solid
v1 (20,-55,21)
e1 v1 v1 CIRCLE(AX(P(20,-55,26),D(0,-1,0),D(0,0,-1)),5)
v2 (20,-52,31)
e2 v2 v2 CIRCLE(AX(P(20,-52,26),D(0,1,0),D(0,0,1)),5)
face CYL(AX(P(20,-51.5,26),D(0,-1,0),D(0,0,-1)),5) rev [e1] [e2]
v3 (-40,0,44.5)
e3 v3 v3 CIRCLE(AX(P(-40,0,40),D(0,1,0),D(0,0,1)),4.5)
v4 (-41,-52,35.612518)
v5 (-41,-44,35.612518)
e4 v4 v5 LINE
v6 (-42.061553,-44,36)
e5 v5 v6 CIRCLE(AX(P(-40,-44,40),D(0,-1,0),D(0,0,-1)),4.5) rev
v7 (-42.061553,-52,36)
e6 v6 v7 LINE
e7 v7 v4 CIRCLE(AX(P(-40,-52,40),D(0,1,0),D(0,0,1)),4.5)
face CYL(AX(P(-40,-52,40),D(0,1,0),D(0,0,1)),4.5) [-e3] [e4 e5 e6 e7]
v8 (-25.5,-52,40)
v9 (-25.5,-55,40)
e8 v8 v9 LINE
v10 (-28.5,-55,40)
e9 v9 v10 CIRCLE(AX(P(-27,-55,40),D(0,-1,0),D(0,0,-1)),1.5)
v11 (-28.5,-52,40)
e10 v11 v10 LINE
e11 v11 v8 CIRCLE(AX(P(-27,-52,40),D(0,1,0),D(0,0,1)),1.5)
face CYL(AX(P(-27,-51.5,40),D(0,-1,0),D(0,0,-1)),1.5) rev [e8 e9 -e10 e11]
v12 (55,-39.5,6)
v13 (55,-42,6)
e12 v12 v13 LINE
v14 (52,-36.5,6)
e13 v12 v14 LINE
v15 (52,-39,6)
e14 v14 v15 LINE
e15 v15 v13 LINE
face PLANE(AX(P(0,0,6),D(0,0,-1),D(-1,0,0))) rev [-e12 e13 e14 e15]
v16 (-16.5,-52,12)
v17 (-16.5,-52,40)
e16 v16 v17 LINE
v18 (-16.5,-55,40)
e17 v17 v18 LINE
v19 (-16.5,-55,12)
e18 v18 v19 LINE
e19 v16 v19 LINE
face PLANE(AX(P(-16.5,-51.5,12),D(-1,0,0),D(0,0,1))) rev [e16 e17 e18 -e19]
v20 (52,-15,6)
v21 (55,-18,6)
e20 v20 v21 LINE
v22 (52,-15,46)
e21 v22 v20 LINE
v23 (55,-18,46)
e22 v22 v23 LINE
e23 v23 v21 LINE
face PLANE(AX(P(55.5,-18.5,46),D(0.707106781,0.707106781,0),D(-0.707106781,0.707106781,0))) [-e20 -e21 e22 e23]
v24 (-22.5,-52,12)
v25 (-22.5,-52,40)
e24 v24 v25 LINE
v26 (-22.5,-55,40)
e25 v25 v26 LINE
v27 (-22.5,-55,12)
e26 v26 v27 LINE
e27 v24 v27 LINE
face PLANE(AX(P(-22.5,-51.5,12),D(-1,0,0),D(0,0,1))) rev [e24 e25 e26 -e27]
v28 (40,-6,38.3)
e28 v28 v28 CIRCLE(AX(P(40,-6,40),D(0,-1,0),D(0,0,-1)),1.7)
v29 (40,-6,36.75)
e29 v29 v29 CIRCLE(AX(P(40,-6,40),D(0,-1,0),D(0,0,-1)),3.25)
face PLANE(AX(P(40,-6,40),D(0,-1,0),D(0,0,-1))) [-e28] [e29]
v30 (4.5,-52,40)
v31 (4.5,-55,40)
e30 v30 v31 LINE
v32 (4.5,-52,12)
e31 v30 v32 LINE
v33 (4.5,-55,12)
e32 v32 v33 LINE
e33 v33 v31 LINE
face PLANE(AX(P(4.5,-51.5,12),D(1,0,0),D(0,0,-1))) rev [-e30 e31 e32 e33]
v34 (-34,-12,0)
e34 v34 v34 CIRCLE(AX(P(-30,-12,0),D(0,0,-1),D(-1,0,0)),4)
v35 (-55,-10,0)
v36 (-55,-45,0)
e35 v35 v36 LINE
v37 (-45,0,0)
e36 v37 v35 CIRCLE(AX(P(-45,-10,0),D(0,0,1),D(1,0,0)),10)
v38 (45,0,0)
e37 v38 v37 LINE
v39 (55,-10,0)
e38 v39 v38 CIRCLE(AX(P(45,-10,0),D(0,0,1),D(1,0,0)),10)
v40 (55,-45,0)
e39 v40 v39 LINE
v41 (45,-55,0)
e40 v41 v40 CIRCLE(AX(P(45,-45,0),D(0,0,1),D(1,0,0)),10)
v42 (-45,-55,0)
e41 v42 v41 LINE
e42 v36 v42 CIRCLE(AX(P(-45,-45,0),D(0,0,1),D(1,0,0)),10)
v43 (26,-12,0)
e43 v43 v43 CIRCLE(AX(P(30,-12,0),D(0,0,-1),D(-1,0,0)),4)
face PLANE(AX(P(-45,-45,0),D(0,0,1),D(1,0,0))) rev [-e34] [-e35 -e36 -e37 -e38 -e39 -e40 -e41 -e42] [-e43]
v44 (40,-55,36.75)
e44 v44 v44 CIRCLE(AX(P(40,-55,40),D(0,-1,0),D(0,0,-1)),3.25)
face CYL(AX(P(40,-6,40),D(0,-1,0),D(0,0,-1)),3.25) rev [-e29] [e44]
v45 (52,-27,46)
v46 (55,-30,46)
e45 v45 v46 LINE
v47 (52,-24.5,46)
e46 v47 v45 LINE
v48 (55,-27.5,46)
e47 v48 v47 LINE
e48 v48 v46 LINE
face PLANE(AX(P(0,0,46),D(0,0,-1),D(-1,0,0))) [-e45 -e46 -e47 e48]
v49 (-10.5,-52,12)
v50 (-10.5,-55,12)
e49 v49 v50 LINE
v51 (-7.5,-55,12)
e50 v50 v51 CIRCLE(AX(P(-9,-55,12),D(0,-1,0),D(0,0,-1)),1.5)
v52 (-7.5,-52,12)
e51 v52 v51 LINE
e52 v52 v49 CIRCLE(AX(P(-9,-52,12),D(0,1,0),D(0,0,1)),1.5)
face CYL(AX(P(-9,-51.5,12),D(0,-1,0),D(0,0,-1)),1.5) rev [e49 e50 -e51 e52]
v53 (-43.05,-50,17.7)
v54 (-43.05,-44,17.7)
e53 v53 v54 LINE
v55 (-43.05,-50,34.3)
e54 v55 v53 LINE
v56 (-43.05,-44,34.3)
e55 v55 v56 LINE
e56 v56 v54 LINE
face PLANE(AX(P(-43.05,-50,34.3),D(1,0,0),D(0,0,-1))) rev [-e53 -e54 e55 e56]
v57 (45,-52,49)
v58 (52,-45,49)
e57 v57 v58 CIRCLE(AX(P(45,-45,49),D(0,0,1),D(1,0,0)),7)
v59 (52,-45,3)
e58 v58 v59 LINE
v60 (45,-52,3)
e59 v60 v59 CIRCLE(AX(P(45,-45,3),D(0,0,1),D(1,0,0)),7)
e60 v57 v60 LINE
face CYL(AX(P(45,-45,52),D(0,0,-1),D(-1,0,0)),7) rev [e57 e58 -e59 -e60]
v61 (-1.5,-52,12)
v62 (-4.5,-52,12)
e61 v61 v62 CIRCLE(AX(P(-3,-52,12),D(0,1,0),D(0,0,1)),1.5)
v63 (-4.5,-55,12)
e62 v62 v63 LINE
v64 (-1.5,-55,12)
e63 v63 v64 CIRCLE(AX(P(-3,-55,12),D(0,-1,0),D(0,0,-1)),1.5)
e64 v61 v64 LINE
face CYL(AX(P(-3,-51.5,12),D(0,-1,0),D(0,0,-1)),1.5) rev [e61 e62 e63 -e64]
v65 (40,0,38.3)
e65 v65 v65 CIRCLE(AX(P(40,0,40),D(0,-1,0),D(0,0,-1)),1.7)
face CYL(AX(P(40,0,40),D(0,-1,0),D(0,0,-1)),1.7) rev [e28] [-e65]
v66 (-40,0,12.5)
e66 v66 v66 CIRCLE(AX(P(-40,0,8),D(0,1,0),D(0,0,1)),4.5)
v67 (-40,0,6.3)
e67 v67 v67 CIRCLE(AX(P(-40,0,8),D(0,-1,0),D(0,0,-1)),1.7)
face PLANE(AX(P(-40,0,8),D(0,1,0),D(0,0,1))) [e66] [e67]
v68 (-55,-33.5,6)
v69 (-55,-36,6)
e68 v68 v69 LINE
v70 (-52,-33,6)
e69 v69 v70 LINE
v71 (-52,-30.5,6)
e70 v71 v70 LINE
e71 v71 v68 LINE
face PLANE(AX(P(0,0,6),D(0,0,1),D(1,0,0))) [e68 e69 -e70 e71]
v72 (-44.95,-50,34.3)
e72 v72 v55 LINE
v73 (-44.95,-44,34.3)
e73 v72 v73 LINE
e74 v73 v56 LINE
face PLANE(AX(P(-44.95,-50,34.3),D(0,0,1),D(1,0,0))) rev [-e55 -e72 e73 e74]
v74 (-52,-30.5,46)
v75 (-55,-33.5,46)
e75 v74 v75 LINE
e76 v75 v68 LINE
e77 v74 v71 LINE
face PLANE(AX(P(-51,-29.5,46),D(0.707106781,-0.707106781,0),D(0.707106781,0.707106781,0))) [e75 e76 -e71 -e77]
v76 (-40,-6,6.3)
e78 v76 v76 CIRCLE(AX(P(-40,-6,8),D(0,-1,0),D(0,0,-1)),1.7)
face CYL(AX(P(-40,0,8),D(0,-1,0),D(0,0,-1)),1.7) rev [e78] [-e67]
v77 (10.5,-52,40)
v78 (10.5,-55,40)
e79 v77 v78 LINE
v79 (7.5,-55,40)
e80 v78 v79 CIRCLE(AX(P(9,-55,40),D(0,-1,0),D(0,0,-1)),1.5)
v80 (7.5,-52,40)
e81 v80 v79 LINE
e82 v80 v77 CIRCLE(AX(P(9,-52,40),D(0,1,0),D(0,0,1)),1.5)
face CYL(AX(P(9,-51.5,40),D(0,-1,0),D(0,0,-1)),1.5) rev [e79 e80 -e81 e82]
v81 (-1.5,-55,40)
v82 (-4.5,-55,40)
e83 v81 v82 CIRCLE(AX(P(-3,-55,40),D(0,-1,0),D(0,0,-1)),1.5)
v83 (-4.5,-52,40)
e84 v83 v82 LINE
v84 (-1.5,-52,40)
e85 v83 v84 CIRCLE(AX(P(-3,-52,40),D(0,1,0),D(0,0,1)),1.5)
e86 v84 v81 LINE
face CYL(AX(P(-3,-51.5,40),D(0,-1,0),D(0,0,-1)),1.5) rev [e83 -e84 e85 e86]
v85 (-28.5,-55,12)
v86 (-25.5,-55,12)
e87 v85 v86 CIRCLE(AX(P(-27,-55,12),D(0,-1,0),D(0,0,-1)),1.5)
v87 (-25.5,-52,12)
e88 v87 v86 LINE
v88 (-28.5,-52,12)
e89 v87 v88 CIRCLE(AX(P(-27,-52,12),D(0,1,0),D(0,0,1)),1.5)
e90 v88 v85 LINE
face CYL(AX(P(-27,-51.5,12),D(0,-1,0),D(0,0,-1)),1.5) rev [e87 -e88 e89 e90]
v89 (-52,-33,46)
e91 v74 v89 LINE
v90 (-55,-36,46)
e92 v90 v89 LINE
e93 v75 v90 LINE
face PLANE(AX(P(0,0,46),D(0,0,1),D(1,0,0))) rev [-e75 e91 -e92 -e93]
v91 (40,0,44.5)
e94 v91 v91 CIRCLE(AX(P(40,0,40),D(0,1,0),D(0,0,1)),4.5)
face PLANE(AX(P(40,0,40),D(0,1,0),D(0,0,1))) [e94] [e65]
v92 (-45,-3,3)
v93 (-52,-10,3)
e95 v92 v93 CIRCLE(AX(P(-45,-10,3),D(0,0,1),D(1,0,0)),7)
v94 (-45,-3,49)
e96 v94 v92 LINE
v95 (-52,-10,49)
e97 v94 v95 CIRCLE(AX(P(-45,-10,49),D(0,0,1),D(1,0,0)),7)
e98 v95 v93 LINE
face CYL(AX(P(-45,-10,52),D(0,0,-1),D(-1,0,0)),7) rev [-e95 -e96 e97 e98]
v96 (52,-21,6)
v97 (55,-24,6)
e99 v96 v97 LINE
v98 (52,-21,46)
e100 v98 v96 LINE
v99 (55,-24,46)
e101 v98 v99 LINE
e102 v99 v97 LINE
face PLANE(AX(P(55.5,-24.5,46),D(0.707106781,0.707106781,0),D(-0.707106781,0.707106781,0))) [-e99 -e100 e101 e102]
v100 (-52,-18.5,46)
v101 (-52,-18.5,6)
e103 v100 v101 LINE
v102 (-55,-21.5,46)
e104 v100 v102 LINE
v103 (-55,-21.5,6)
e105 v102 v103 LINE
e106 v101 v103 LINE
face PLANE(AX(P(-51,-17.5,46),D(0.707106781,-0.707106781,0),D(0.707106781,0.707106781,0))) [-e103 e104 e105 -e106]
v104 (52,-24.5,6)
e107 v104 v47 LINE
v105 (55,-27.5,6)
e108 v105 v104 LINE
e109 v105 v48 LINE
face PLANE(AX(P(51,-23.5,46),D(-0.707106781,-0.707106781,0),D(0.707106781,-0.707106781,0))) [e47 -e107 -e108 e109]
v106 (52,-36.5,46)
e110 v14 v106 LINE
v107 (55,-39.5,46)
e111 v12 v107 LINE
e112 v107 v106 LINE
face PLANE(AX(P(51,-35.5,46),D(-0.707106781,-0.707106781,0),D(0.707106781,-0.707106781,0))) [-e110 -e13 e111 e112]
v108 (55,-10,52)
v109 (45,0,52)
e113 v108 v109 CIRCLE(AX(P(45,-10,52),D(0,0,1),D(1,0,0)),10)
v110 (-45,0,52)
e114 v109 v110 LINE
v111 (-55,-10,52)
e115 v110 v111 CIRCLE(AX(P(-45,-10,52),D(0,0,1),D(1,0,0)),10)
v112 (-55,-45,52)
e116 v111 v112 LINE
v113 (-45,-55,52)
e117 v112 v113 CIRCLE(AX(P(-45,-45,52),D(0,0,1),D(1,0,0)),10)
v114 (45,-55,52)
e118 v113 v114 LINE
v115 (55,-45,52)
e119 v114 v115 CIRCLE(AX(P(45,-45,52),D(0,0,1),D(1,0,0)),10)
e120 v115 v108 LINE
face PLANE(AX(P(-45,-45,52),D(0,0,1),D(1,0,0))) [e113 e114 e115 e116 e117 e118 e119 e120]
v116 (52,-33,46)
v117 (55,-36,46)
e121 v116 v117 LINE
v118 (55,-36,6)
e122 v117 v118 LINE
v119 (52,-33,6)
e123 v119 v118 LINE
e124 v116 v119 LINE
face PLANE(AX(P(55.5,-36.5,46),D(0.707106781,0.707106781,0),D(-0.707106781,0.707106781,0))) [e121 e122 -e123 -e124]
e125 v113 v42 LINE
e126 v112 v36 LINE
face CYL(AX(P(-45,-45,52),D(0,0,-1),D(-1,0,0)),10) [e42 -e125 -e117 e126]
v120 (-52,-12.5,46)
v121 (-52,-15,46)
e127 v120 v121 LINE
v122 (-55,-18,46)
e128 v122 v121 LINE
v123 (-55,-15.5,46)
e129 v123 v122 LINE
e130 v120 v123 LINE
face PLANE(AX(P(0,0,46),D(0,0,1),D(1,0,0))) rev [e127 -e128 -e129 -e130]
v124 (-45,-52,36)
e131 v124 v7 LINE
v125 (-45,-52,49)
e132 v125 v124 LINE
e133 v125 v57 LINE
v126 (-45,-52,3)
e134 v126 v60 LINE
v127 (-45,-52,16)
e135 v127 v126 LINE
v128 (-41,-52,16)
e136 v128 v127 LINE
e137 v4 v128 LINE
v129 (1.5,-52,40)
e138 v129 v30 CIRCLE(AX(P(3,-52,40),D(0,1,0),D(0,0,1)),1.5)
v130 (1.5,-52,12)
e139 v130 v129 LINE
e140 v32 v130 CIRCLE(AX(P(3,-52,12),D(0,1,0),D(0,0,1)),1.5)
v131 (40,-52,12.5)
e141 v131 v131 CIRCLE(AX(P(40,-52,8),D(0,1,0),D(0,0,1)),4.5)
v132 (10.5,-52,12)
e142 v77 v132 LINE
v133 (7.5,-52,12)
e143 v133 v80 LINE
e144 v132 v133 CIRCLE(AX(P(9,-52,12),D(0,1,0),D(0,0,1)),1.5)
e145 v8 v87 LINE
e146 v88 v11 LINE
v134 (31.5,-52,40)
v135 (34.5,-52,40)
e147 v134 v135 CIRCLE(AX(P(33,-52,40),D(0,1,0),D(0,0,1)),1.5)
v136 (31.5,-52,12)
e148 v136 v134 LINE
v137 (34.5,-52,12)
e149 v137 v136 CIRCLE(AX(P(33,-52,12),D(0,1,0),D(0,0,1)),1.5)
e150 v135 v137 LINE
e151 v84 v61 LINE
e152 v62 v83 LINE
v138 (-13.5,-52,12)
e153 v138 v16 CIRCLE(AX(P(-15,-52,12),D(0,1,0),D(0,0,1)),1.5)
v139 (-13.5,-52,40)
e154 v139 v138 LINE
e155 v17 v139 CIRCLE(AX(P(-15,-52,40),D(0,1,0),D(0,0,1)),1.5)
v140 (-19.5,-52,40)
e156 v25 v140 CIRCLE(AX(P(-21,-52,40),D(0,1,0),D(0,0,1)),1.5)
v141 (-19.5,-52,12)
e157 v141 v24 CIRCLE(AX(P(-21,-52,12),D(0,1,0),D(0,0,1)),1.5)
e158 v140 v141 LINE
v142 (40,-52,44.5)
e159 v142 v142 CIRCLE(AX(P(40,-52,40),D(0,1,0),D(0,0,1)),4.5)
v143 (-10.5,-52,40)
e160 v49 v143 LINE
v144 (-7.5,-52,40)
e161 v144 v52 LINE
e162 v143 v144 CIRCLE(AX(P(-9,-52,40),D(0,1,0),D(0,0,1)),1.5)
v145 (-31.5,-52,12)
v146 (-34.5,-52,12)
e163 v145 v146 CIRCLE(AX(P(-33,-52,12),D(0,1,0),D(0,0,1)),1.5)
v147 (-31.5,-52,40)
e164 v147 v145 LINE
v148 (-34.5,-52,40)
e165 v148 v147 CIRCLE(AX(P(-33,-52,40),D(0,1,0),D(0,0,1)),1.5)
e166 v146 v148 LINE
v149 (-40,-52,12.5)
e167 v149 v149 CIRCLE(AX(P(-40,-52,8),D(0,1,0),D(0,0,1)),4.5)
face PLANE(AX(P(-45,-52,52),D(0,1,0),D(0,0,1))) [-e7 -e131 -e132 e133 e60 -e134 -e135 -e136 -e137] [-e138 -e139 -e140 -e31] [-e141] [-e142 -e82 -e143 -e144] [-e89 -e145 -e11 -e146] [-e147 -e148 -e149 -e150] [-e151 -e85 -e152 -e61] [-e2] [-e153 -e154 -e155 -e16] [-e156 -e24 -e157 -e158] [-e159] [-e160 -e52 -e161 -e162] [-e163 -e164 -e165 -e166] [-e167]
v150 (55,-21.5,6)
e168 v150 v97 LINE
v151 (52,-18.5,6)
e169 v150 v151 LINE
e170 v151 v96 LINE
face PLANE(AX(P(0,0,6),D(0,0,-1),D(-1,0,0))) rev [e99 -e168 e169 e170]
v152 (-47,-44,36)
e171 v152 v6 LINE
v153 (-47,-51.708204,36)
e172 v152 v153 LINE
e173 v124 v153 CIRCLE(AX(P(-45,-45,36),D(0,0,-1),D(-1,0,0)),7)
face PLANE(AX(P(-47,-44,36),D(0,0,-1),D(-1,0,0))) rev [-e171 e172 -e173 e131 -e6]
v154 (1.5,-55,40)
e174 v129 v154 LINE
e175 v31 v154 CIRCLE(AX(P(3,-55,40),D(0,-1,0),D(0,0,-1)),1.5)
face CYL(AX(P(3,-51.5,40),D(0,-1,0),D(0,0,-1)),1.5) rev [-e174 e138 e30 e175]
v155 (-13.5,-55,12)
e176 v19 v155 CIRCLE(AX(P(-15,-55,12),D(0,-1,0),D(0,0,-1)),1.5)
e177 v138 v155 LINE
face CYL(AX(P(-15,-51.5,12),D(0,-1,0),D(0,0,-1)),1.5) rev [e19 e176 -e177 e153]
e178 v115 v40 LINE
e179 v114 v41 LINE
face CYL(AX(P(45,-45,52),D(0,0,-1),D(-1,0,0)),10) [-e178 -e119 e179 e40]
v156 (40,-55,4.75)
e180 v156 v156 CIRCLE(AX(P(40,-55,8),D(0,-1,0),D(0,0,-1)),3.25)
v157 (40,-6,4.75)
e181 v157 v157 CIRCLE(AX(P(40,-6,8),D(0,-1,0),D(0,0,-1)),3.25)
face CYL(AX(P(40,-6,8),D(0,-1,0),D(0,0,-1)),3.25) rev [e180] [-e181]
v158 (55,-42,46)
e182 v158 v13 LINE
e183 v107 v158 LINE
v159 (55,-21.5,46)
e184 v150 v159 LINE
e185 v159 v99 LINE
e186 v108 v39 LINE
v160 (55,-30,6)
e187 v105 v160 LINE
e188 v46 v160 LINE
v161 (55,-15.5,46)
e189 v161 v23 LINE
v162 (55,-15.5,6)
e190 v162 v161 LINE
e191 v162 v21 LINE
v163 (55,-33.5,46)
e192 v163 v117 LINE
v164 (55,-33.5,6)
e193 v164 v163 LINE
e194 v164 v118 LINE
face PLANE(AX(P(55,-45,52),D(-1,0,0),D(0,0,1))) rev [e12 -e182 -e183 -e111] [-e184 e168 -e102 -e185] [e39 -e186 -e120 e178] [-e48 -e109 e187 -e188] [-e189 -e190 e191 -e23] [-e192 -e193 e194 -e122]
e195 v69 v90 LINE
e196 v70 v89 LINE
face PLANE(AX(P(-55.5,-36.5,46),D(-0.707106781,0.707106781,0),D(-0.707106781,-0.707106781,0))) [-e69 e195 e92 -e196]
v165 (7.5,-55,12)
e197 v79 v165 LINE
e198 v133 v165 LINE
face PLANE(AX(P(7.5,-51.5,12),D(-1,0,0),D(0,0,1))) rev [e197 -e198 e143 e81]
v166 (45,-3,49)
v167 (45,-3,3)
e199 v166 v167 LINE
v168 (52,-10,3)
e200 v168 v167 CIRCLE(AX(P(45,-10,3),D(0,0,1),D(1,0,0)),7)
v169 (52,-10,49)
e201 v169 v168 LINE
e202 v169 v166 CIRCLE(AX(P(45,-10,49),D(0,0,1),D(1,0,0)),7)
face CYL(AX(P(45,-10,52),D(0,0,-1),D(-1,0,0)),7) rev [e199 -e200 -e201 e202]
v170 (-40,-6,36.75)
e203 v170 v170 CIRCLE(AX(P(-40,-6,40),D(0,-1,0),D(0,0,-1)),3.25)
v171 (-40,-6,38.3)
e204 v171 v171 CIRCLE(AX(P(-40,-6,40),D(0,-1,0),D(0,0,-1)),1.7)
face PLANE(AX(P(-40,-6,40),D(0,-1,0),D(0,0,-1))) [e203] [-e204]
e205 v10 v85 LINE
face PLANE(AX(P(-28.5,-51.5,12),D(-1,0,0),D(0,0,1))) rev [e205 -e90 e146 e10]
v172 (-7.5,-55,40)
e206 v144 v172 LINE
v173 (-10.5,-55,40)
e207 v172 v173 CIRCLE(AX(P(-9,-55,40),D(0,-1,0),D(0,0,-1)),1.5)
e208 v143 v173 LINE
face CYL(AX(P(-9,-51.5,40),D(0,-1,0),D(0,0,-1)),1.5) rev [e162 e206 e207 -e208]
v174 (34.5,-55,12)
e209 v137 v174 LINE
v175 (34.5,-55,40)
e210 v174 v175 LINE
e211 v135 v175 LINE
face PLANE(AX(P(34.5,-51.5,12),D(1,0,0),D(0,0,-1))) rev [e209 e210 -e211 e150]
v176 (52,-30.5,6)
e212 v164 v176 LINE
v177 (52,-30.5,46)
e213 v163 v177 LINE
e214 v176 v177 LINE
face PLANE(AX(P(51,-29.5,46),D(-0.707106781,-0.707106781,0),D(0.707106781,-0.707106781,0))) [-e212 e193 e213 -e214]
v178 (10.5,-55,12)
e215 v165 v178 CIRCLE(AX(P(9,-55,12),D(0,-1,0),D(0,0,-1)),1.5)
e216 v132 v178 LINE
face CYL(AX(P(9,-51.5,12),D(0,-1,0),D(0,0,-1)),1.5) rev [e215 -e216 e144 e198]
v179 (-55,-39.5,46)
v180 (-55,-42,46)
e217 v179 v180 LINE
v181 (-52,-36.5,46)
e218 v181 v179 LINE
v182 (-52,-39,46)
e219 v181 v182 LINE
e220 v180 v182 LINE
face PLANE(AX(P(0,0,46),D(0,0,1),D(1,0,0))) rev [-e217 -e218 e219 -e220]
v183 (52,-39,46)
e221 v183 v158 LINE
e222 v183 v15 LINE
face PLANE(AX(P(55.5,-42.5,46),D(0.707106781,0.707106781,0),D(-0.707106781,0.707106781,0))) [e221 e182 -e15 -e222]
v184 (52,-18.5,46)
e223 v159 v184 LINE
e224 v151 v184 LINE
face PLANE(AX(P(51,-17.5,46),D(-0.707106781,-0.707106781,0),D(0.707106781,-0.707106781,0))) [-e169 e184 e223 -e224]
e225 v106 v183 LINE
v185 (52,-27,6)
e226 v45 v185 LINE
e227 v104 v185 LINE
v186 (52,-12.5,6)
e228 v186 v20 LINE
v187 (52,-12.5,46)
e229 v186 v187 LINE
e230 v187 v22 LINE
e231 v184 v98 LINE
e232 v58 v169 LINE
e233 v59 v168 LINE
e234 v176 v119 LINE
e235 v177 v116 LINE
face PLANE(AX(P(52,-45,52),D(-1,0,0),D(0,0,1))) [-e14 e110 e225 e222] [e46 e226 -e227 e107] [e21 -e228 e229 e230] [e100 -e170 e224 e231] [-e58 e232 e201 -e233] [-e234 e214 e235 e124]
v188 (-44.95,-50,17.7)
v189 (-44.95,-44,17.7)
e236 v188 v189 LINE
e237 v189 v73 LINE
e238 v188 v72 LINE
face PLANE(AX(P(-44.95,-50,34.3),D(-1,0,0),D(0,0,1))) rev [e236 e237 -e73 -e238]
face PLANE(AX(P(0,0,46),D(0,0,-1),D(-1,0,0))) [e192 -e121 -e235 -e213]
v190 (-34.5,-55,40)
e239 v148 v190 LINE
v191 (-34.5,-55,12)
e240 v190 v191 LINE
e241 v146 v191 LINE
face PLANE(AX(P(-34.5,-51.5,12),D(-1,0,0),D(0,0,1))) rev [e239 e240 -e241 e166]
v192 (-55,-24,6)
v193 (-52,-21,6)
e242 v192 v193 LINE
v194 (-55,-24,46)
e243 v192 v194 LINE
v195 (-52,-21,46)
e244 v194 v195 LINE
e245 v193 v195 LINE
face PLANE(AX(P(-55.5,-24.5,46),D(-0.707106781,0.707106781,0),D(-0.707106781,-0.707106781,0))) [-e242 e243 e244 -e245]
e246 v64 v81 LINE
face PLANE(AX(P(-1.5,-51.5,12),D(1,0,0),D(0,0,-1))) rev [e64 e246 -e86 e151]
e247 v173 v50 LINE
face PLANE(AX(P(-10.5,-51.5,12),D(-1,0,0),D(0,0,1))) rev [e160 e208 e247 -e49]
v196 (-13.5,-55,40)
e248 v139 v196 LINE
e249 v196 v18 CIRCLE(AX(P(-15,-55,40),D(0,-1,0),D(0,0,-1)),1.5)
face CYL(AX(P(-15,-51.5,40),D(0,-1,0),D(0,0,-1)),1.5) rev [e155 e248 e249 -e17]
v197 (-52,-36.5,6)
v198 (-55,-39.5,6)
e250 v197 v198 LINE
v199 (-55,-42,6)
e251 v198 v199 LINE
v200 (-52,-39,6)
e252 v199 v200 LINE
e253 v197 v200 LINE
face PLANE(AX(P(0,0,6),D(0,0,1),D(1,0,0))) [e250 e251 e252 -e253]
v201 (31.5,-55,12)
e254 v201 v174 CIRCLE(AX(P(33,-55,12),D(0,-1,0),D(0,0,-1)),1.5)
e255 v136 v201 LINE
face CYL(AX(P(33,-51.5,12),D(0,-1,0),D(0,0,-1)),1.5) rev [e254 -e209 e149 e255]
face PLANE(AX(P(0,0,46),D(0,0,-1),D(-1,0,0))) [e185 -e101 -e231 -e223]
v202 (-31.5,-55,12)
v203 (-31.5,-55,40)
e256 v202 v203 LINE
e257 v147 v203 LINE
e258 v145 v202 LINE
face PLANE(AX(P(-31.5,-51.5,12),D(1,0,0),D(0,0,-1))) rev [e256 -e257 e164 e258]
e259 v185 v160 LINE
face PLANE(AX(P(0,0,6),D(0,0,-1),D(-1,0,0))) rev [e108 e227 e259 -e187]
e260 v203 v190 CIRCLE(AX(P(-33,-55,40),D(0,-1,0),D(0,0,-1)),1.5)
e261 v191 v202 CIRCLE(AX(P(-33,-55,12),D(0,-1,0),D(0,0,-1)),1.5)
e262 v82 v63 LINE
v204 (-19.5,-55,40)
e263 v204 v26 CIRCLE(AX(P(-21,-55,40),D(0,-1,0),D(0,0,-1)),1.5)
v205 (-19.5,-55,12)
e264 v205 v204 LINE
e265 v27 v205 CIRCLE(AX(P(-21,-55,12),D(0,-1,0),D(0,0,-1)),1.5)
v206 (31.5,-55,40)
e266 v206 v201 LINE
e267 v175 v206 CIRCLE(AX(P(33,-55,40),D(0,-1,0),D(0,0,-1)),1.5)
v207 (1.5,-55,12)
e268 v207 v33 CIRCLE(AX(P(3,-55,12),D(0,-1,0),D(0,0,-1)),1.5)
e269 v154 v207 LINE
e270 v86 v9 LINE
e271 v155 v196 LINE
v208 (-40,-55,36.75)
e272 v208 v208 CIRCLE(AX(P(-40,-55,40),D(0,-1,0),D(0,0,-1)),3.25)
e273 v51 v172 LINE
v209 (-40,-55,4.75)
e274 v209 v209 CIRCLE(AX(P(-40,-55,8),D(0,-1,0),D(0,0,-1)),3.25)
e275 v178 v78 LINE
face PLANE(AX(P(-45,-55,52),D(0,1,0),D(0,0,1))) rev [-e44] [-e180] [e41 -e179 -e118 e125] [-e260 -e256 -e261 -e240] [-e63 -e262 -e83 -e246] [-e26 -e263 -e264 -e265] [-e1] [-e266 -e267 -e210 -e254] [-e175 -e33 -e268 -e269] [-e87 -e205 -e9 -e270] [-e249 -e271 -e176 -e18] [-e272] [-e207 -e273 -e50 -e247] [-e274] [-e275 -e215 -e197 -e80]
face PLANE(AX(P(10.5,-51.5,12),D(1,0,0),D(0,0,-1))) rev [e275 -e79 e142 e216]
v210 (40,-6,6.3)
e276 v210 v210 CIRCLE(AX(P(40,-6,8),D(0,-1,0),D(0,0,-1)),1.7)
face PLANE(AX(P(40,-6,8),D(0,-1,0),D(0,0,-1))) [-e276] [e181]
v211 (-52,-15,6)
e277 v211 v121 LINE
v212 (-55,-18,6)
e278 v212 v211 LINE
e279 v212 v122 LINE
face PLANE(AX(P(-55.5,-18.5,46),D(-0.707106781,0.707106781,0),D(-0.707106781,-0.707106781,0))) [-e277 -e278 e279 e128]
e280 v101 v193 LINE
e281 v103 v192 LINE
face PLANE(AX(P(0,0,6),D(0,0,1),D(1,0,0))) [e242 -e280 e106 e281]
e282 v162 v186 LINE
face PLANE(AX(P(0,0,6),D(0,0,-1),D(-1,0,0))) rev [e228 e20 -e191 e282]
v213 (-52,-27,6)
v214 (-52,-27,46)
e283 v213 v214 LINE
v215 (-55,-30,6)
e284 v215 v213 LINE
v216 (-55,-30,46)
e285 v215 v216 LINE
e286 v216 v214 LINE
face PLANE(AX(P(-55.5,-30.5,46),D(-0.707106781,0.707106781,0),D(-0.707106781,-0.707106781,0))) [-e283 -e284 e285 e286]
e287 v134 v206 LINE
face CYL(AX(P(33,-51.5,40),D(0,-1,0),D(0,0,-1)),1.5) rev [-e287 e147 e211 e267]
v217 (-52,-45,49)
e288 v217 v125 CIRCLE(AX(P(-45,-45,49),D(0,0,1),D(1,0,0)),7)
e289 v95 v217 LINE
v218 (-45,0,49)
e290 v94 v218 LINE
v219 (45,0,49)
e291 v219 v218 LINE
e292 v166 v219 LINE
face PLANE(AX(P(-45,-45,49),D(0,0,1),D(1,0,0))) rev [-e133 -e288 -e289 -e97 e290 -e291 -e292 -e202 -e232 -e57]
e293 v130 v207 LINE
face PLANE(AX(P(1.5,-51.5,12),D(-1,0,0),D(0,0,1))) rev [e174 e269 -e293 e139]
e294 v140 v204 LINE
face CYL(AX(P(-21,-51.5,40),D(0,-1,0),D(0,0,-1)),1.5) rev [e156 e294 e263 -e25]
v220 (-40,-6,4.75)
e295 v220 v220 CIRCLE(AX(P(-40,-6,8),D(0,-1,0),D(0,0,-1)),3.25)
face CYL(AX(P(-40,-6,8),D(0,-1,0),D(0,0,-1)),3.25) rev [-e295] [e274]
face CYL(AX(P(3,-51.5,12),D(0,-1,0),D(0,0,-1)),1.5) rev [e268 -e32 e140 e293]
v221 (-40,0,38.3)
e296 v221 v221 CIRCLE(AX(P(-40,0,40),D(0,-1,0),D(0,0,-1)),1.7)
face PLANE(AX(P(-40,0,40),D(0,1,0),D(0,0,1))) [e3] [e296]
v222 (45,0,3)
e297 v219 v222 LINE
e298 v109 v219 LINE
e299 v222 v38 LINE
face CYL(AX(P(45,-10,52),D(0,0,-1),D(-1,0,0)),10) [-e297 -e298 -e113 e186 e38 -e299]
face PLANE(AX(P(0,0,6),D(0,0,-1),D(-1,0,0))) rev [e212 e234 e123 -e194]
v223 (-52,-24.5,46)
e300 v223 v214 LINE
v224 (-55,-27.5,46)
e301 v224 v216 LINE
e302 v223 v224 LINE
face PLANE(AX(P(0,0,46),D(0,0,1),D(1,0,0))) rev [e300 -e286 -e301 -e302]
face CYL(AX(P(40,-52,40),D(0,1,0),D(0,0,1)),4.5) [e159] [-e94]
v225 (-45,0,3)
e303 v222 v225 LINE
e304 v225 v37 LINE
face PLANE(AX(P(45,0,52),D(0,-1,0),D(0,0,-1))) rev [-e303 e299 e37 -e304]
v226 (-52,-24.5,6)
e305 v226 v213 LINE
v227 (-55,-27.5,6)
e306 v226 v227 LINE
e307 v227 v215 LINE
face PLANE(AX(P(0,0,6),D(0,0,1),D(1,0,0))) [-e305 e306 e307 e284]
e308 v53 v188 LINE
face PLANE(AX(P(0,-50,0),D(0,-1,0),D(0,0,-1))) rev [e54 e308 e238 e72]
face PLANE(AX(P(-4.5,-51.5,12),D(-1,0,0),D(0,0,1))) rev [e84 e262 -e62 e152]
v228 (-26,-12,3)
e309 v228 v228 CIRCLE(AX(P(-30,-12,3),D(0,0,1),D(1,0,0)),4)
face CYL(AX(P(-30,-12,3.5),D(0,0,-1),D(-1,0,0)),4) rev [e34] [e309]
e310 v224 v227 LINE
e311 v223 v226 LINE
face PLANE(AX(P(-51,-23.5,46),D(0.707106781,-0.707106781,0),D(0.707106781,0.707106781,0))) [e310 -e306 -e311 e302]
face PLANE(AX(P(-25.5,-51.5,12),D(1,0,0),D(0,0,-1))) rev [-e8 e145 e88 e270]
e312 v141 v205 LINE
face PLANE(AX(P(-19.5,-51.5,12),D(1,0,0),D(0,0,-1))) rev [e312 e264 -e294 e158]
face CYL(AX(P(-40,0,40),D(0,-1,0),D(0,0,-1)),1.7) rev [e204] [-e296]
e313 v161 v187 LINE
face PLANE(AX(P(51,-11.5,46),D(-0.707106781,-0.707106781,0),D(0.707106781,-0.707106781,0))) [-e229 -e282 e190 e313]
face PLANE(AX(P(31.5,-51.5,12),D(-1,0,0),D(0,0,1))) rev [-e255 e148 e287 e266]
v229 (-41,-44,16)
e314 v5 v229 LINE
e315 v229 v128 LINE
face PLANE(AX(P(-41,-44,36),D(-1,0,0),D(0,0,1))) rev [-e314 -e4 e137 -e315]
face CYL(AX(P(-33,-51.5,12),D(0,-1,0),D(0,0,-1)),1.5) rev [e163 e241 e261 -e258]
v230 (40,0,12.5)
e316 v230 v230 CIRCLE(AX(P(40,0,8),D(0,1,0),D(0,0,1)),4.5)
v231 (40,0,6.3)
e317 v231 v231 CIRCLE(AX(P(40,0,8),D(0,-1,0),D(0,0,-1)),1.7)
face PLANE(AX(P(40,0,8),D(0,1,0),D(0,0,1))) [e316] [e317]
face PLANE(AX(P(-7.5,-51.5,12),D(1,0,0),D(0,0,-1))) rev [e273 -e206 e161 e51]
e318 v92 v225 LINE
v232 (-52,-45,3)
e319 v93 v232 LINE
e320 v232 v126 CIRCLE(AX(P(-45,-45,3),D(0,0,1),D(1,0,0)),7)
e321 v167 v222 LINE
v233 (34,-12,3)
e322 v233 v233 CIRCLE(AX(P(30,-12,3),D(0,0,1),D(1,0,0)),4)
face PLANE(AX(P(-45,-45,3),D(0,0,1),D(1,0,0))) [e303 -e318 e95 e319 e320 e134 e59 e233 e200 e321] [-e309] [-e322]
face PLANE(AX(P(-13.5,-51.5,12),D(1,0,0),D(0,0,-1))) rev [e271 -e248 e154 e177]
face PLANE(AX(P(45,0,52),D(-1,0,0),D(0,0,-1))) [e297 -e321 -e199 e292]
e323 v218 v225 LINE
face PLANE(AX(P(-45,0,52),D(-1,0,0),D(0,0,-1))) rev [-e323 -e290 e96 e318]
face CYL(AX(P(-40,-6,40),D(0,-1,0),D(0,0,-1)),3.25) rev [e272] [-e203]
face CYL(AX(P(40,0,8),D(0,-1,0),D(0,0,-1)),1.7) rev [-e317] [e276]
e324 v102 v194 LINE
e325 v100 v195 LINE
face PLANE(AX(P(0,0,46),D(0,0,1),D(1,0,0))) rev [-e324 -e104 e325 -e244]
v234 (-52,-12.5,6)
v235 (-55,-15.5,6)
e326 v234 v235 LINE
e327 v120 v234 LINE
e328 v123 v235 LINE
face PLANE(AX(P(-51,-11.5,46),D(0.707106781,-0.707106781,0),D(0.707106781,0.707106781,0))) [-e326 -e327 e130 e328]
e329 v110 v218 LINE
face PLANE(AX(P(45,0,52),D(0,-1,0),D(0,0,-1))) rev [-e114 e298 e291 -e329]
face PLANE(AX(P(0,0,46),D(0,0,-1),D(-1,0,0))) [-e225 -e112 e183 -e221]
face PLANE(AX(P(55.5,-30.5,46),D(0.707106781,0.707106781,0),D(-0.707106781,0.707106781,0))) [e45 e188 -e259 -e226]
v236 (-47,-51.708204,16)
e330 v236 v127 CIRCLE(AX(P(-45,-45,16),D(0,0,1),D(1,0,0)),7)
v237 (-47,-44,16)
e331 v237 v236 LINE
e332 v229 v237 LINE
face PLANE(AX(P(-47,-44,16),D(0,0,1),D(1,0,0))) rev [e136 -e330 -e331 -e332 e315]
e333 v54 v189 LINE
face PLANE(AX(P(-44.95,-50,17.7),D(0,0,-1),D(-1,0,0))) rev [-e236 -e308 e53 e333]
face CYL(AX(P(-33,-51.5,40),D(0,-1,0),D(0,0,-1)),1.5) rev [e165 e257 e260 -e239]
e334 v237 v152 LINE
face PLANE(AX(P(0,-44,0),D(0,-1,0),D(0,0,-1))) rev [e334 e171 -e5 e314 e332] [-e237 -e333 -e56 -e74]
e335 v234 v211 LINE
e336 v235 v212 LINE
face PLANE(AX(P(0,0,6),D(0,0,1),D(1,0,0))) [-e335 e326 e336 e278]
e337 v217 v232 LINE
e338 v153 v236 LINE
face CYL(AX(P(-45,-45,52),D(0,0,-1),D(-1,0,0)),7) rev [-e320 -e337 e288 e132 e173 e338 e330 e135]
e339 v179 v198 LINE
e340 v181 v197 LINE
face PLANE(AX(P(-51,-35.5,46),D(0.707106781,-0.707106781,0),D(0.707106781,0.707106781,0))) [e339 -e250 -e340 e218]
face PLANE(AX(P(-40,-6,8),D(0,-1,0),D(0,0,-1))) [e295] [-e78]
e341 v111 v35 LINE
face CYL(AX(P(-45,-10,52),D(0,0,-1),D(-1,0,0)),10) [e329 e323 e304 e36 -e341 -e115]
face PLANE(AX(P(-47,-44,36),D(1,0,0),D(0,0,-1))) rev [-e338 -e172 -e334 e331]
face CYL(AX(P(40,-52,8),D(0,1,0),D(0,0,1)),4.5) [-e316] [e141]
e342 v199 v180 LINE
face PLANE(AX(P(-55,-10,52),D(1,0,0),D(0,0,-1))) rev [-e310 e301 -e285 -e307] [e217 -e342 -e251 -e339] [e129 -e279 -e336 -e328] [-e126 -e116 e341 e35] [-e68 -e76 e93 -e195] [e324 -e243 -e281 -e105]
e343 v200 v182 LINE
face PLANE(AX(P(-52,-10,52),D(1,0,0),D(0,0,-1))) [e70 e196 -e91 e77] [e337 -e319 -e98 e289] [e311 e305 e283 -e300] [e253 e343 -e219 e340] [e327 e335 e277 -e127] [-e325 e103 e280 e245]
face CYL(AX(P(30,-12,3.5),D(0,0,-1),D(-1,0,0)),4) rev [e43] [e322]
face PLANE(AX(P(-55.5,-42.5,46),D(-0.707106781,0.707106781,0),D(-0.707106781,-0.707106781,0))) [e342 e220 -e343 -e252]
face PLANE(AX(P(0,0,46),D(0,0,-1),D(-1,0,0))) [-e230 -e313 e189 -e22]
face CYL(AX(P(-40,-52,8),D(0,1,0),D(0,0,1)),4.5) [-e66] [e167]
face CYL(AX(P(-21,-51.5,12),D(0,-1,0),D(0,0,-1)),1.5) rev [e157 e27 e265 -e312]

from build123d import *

# Parameters (mm, degrees)
BOSS_EXTRUDE1_DEPTH     = 52
SHELL1_START            = 3
SHELL1_DEPTH            = 46
SKETCH2_R               = 4.5
BOSS_EXTRUDE2_DEPTH     = 52
SKETCH3_R               = 3.25
CUT_EXTRUDE1_DEPTH      = 49
SKETCH4_R               = 1.7
CUT_EXTRUDE2_DEPTH      = 91.166512631
CUT_EXTRUDE3_DEPTH      = 20
CUT_EXTRUDE3_DEPTH_BACK = 20
CUT_EXTRUDE4_DEPTH      = 3.5
SKETCH7_R               = 4
CUT_EXTRUDE5_DEPTH      = 3.5
SKETCH8_W               = 6
SKETCH8_H               = 20
BOSS_EXTRUDE3_DEPTH     = 8
SKETCH9_W               = 1.9
SKETCH9_H               = 16.6
CUT_EXTRUDE6_DEPTH      = 6
SKETCH10_R              = 5
CUT_EXTRUDE7_DEPTH      = 3.5


# Read off the part's stored shape, not the designer's step: Shell1
with BuildPart() as part:
    # Sketch1 → Boss-Extrude1 (new body)
    with BuildSketch(Plane.XY):
        with BuildLine():
            Line((-45, -55), (45, -55))
            ThreePointArc((45, -55), (52.071067812, -52.071067812), (55, -45))
            Line((55, -45), (55, -10))
            ThreePointArc((55, -10), (52.071067812, -2.928932188), (45, 0))
            Line((45, 0), (-45, 0))
            ThreePointArc((-45, 0), (-52.071067812, -2.928932188), (-55, -10))
            Line((-55, -10), (-55, -45))
            ThreePointArc((-55, -45), (-52.071067812, -52.071067812), (-45, -55))
        make_face()
    extrude(amount=BOSS_EXTRUDE1_DEPTH)

    # Shell1 outline → Shell1 (cut)
    with BuildSketch(Plane.XY.offset(SHELL1_START)):
        with BuildLine():
            Line((45, -3), (45, 0))
            Line((45, 0), (-45, 0))
            Line((-45, 0), (-45, -3))
            ThreePointArc((-45, -3), (-49.949747468, -5.050252532), (-52, -10))
            Line((-52, -10), (-52, -45))
            ThreePointArc((-52, -45), (-49.949747468, -49.949747468), (-45, -52))
            Line((-45, -52), (45, -52))
            ThreePointArc((45, -52), (49.949747468, -49.949747468), (52, -45))
            Line((52, -45), (52, -10))
            ThreePointArc((52, -10), (49.949747468, -5.050252532), (45, -3))
        make_face()
    extrude(amount=SHELL1_DEPTH, mode=Mode.SUBTRACT)

    # Sketch2 → Boss-Extrude2 (add)
    with BuildSketch(Plane(origin=(0, 0, 0), x_dir=(1, 0, 0), z_dir=(0, 1, 0))):
        with Locations(Location((-40, -8, 0), (0, 0, 270))):
            Circle(SKETCH2_R)
        with Locations(Location((40, -8, 0), (0, 0, 270))):
            Circle(SKETCH2_R)
        with Locations(Location((-40, -40, 0), (0, 0, 270))):
            Circle(SKETCH2_R)
        with Locations(Location((40, -40, 0), (0, 0, 270))):
            Circle(SKETCH2_R)
    extrude(amount=-BOSS_EXTRUDE2_DEPTH)

    # Sketch3 → Cut-Extrude1 (cut)
    with BuildSketch(Plane.XZ.offset(55)):
        with Locations(Location((-40, 8, 0), (0, 0, 270))):
            Circle(SKETCH3_R)
        with Locations(Location((40, 8, 0), (0, 0, 270))):
            Circle(SKETCH3_R)
        with Locations(Location((-40, 40, 0), (0, 0, 270))):
            Circle(SKETCH3_R)
        with Locations(Location((40, 40, 0), (0, 0, 270))):
            Circle(SKETCH3_R)
    extrude(amount=-CUT_EXTRUDE1_DEPTH, mode=Mode.SUBTRACT)

    # Sketch4 → Cut-Extrude2 (cut, through all)
    with BuildSketch(Plane.XZ.offset(6)):
        with Locations(Location((-40, 8, 0), (0, 0, 270))):
            Circle(SKETCH4_R)
        with Locations(Location((40, 8, 0), (0, 0, 270))):
            Circle(SKETCH4_R)
        with Locations(Location((-40, 40, 0), (0, 0, 270))):
            Circle(SKETCH4_R)
        with Locations(Location((40, 40, 0), (0, 0, 270))):
            Circle(SKETCH4_R)
    extrude(amount=-CUT_EXTRUDE2_DEPTH, mode=Mode.SUBTRACT)

    # Sketch5 → Cut-Extrude3 (cut, two sides: drawn at the far end of the back side and taken through both)
    with BuildSketch(Plane.XY.offset(26).offset(-CUT_EXTRUDE3_DEPTH_BACK)):
        Polygon((-51, -14), (-51, -11.5), (-55.5, -16), (-55.5, -18.5), align=None)
        Polygon((51, -14), (51, -11.5), (55.5, -16), (55.5, -18.5), align=None)
        Polygon((-51, -20), (-51, -17.5), (-55.5, -22), (-55.5, -24.5), align=None)
        Polygon((51, -20), (51, -17.5), (55.5, -22), (55.5, -24.5), align=None)
        Polygon((-51, -26), (-51, -23.5), (-55.5, -28), (-55.5, -30.5), align=None)
        Polygon((51, -26), (51, -23.5), (55.5, -28), (55.5, -30.5), align=None)
        Polygon((-51, -32), (-51, -29.5), (-55.5, -34), (-55.5, -36.5), align=None)
        Polygon((51, -32), (51, -29.5), (55.5, -34), (55.5, -36.5), align=None)
        Polygon((-51, -38), (-51, -35.5), (-55.5, -40), (-55.5, -42.5), align=None)
        Polygon((51, -38), (51, -35.5), (55.5, -40), (55.5, -42.5), align=None)
    extrude(amount=CUT_EXTRUDE3_DEPTH + CUT_EXTRUDE3_DEPTH_BACK, mode=Mode.SUBTRACT)

    # Sketch6 → Cut-Extrude4 (cut)
    with BuildSketch(Plane.XZ.offset(55)):
        with BuildLine():
            Line((-34.5, 12), (-34.5, 40))
            ThreePointArc((-34.5, 40), (-33, 41.5), (-31.5, 40))
            Line((-31.5, 40), (-31.5, 12))
            ThreePointArc((-31.5, 12), (-33, 10.5), (-34.5, 12))
        make_face()
        with BuildLine():
            Line((-28.5, 12), (-28.5, 40))
            ThreePointArc((-28.5, 40), (-27, 41.5), (-25.5, 40))
            Line((-25.5, 40), (-25.5, 12))
            ThreePointArc((-25.5, 12), (-27, 10.5), (-28.5, 12))
        make_face()
        with BuildLine():
            Line((-22.5, 12), (-22.5, 40))
            ThreePointArc((-22.5, 40), (-21, 41.5), (-19.5, 40))
            Line((-19.5, 40), (-19.5, 12))
            ThreePointArc((-19.5, 12), (-21, 10.5), (-22.5, 12))
        make_face()
        with BuildLine():
            Line((-16.5, 12), (-16.5, 40))
            ThreePointArc((-16.5, 40), (-15, 41.5), (-13.5, 40))
            Line((-13.5, 40), (-13.5, 12))
            ThreePointArc((-13.5, 12), (-15, 10.5), (-16.5, 12))
        make_face()
        with BuildLine():
            Line((-10.5, 12), (-10.5, 40))
            ThreePointArc((-10.5, 40), (-9, 41.5), (-7.5, 40))
            Line((-7.5, 40), (-7.5, 12))
            ThreePointArc((-7.5, 12), (-9, 10.5), (-10.5, 12))
        make_face()
        with BuildLine():
            Line((-4.5, 12), (-4.5, 40))
            ThreePointArc((-4.5, 40), (-3, 41.5), (-1.5, 40))
            Line((-1.5, 40), (-1.5, 12))
            ThreePointArc((-1.5, 12), (-3, 10.5), (-4.5, 12))
        make_face()
        with BuildLine():
            Line((1.5, 12), (1.5, 40))
            ThreePointArc((1.5, 40), (3, 41.5), (4.5, 40))
            Line((4.5, 40), (4.5, 12))
            ThreePointArc((4.5, 12), (3, 10.5), (1.5, 12))
        make_face()
        with BuildLine():
            Line((7.5, 12), (7.5, 40))
            ThreePointArc((7.5, 40), (9, 41.5), (10.5, 40))
            Line((10.5, 40), (10.5, 12))
            ThreePointArc((10.5, 12), (9, 10.5), (7.5, 12))
        make_face()
        with BuildLine():
            Line((31.5, 12), (31.5, 40))
            ThreePointArc((31.5, 40), (33, 41.5), (34.5, 40))
            Line((34.5, 40), (34.5, 12))
            ThreePointArc((34.5, 12), (33, 10.5), (31.5, 12))
        make_face()
    extrude(amount=-CUT_EXTRUDE4_DEPTH, mode=Mode.SUBTRACT)

    # Sketch7 → Cut-Extrude5 (cut)
    with BuildSketch(Plane(origin=(0, 0, 0), x_dir=(-1, 0, 0), z_dir=(0, 0, -1))):
        with Locations((30, -12)):
            Circle(SKETCH7_R)
        with Locations((-30, -12)):
            Circle(SKETCH7_R)
    extrude(amount=-CUT_EXTRUDE5_DEPTH, mode=Mode.SUBTRACT)

    # Sketch8 → Boss-Extrude3 (add)
    with BuildSketch(Plane(origin=(0, -52, 0), x_dir=(1, 0, 0), z_dir=(0, 1, 0))):
        with Locations((-44, -26)):
            Rectangle(SKETCH8_W, SKETCH8_H)
    extrude(amount=BOSS_EXTRUDE3_DEPTH)

    # Sketch9 → Cut-Extrude6 (cut)
    with BuildSketch(Plane(origin=(0, -44, 0), x_dir=(1, 0, 0), z_dir=(0, 1, 0))):
        with Locations((-44, -26)):
            Rectangle(SKETCH9_W, SKETCH9_H)
    extrude(amount=-CUT_EXTRUDE6_DEPTH, mode=Mode.SUBTRACT)

    # Sketch10 → Cut-Extrude7 (cut)
    with BuildSketch(Plane.XZ.offset(55)):
        with Locations(Location((20, 26, 0), (0, 0, 270))):
            Circle(SKETCH10_R)
    extrude(amount=-CUT_EXTRUDE7_DEPTH, mode=Mode.SUBTRACT)


solid = part.part
